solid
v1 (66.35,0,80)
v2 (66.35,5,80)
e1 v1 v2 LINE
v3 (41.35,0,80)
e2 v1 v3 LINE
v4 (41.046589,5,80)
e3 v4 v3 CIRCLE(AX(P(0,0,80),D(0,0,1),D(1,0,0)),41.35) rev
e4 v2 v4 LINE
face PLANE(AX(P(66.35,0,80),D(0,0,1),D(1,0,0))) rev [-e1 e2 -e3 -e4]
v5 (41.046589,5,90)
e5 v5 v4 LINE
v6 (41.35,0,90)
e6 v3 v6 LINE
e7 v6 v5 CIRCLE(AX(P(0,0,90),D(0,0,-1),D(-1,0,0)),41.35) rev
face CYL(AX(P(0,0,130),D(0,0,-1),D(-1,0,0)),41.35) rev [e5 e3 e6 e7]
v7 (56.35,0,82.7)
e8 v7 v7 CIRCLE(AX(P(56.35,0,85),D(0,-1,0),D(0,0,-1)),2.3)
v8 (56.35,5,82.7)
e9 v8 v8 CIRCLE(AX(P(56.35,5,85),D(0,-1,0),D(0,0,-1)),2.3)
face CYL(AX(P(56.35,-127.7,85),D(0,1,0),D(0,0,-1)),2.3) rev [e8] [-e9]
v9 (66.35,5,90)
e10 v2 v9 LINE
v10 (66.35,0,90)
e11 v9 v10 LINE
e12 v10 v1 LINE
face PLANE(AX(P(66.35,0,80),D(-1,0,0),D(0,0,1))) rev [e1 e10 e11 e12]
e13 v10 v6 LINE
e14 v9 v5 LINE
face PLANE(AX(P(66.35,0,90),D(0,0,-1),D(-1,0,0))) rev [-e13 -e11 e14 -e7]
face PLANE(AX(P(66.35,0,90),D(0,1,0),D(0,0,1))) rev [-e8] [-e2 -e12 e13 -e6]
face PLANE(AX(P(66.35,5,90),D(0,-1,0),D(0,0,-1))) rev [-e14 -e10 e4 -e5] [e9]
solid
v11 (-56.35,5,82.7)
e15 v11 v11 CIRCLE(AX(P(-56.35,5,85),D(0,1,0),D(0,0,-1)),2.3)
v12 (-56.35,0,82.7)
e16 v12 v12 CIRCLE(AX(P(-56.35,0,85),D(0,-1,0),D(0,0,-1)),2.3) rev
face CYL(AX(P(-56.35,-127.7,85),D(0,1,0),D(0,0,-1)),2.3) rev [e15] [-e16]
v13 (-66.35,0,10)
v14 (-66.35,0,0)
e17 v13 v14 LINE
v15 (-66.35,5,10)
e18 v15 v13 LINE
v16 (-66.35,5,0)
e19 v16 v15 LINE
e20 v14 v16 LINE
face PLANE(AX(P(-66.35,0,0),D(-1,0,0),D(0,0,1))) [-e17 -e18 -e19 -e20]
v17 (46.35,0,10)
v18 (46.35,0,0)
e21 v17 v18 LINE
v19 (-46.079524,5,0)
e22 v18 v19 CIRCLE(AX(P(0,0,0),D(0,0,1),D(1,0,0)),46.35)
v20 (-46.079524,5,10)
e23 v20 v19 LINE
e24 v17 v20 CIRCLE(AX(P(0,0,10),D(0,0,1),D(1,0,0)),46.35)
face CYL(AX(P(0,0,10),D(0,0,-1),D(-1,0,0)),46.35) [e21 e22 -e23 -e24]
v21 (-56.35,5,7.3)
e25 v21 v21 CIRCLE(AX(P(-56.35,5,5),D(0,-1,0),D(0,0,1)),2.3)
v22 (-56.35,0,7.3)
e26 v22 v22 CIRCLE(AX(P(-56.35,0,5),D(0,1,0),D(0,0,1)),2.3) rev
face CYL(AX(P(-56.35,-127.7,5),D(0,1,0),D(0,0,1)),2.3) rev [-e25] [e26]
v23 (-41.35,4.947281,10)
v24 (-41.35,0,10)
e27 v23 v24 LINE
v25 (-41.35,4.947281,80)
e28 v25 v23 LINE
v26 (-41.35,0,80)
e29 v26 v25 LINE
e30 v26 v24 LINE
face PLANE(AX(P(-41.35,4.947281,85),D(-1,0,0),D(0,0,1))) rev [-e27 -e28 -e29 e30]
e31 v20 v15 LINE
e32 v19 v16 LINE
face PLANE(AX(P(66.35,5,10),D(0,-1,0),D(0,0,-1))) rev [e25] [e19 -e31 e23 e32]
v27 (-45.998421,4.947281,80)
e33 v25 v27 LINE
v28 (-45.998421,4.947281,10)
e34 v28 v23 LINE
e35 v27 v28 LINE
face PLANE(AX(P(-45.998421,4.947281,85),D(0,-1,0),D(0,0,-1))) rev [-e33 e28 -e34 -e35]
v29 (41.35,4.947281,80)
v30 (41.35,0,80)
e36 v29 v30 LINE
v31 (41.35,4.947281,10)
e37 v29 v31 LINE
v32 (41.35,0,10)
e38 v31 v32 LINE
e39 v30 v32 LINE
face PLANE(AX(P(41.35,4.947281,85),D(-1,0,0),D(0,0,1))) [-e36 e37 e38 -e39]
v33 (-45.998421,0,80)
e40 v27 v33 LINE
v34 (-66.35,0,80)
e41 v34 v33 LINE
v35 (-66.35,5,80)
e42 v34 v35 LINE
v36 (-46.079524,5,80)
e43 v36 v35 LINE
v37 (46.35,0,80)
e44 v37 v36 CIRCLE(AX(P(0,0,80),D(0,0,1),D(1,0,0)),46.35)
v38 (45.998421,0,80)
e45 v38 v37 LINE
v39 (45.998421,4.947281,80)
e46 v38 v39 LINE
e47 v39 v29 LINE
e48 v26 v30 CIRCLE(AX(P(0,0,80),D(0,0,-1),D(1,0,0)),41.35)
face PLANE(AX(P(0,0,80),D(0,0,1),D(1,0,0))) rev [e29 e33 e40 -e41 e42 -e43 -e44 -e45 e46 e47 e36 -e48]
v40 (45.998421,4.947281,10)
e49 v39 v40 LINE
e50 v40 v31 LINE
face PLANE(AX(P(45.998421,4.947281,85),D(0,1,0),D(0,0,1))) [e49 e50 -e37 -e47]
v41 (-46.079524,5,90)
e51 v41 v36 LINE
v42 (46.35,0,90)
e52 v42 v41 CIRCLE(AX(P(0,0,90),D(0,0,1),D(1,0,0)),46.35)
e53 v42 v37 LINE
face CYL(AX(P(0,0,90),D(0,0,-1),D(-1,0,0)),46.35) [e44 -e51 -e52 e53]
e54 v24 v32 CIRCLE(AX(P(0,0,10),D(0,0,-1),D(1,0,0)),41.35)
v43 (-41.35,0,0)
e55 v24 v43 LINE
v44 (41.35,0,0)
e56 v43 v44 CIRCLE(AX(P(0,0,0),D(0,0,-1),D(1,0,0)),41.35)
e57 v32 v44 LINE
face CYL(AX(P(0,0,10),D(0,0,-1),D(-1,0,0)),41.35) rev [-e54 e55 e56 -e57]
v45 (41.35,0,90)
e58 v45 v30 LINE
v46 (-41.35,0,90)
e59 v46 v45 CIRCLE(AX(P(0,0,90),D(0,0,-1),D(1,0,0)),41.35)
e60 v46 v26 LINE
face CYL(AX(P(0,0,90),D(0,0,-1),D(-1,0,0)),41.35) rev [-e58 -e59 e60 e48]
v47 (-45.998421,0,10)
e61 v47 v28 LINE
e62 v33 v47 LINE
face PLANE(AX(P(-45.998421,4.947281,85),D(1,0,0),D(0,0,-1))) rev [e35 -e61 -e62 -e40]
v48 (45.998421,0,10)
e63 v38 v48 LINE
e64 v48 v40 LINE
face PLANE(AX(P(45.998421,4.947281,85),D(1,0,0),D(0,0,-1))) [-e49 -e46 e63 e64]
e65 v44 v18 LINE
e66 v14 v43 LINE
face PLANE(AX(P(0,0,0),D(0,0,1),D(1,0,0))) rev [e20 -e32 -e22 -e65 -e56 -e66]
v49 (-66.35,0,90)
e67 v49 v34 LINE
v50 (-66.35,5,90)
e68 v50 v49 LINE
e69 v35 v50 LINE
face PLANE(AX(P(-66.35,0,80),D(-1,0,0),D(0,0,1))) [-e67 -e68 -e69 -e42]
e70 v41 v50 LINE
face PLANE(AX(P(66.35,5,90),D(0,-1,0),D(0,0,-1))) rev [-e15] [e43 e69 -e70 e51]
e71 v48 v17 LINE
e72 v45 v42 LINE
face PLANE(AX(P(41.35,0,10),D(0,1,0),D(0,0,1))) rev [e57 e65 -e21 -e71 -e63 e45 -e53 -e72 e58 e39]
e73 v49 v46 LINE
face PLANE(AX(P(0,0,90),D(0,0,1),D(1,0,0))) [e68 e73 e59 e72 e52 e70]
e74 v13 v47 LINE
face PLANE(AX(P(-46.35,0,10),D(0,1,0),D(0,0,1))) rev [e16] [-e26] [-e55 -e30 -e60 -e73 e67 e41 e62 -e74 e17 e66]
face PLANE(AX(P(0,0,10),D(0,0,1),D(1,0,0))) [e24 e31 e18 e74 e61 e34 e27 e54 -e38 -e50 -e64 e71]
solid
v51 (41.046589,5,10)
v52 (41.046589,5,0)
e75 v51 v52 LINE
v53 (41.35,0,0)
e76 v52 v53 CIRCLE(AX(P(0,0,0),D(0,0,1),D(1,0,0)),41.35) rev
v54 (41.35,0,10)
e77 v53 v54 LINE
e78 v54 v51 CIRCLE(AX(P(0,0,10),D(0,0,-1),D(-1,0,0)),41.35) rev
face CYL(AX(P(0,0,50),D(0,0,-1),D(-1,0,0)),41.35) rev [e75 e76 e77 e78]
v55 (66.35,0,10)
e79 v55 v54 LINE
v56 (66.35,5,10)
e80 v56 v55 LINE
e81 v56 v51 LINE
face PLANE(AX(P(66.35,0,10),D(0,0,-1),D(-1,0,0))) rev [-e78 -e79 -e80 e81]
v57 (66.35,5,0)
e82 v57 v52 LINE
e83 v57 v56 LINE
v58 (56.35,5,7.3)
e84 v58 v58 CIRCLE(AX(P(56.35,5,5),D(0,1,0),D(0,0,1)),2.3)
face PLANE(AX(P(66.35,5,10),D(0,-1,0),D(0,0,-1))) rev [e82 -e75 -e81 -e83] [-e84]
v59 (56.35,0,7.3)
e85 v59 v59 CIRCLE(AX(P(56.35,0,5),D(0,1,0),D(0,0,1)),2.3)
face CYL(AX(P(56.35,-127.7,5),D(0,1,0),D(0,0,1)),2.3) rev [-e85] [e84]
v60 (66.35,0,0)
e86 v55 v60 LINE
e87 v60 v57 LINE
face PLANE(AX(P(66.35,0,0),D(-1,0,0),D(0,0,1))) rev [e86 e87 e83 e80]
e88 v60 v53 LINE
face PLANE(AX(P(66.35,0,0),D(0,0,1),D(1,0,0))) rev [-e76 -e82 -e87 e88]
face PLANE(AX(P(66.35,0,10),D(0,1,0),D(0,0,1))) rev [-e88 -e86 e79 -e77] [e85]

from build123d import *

# Parameters (mm, degrees)
BOSS_EXTRUDE1_DEPTH     = 10
SKETCH2_W               = 10
SKETCH2_H               = 5
BOSS_EXTRUDE2_DEPTH     = 66.35
SKETCH3_R               = 2.3
CUT_EXTRUDE1_DEPTH      = 132.7
SKETCH4_R               = 41.35
CUT_EXTRUDE3_DEPTH      = 50
LPATTERN4_START         = 80
LPATTERN4_DEPTH         = 10
LPATTERN4_2_DEPTH       = 10
LPATTERN4_3_DEPTH       = 10
MIRROR5_COPY_1_SKETCH_R = 2.3
MIRROR5_COPY_1_DEPTH    = 132.7
SKETCH8_W               = 4.648420871
SKETCH8_H               = 4.94728133
BOSS_EXTRUDE3_DEPTH     = 40


# Read off the part's stored shape, not the designer's step: LPattern4
with BuildPart() as part:
    # Sketch1 → Boss-Extrude1 (new body)
    with BuildSketch(Plane.XY):
        with BuildLine():
            Line((-46.35, 0), (-41.35, 0))
            ThreePointArc((-41.35, 0), (0, 41.35), (41.35, 0))
            Line((41.35, 0), (46.35, 0))
            ThreePointArc((46.35, 0), (0, 46.35), (-46.35, 0))
        make_face()
    extrude(amount=BOSS_EXTRUDE1_DEPTH)



with BuildPart() as body_2:
    # Sketch2 → Boss-Extrude2 (new, symmetric)
    with BuildSketch(Plane(origin=(0, 0, 0), x_dir=(0, 0, -1), z_dir=(1, 0, 0))):
        with Locations((-5, 2.5)):
            Rectangle(SKETCH2_W, SKETCH2_H)
    extrude(amount=BOSS_EXTRUDE2_DEPTH, both=True)

    # Sketch3 → Cut-Extrude1 (cut)
    with BuildSketch(Plane(origin=(0, 5, 0), x_dir=(1, 0, 0), z_dir=(0, 1, 0))):
        with Locations(Location((56.35, -5, 0), (0, 0, 270))):
            Circle(SKETCH3_R)
    cut_extrude1 = extrude(amount=-CUT_EXTRUDE1_DEPTH, mode=Mode.SUBTRACT)

    # Mirror1: Cut-Extrude1 across plane
    add(cut_extrude1.mirror(Plane(origin=(0, 0, 0), x_dir=(0, 0, 1), z_dir=(1, 0, 0))), mode=Mode.SUBTRACT)

    # Sketch4 → Cut-Extrude3 (cut, symmetric)
    with BuildSketch(Plane.XY):
        Circle(SKETCH4_R)
    extrude(amount=CUT_EXTRUDE3_DEPTH, both=True, mode=Mode.SUBTRACT)


with BuildPart() as cut_extrude3_piece_1:
    # of the separate pieces the step leaves, piece 1, a body of its own (cut_extrude3_pieces)
    add(body_2.part.solids().sort_by_distance((-41.35, 0, 10))[0])


with BuildPart() as cut_extrude3_piece_2:
    # of the separate pieces the step leaves, piece 2, a body of its own (cut_extrude3_pieces)
    add(body_2.part.solids().sort_by_distance((66.35, 0, 10))[0])


with BuildPart() as body_4:
    # LPattern4 outline → LPattern4 (new body)
    with BuildSketch(Plane.XY.offset(LPATTERN4_START)):
        with BuildLine():
            Line((66.35, 0), (66.35, 5))
            Line((66.35, 5), (41.046589383, 5))
            ThreePointArc((41.046589383, 5), (41.274077646, 2.504598671), (41.35, 0))
            Line((41.35, 0), (66.35, 0))
        make_face()
    extrude(amount=LPATTERN4_DEPTH)

    # Mirror5: Cut-Extrude1 across plane
    add(cut_extrude1.mirror(Plane.XY.offset(45)), mode=Mode.SUBTRACT)


with BuildPart() as body_5:
    # LPattern4 2 outline → LPattern4 2 (new body)
    with BuildSketch(Plane.XY.offset(LPATTERN4_START)):
        with BuildLine():
            Line((-46.35, 0), (-41.35, 0))
            ThreePointArc((-41.35, 0), (0, 41.35), (41.35, 0))
            Line((41.35, 0), (46.35, 0))
            ThreePointArc((46.35, 0), (0, 46.35), (-46.35, 0))
        make_face()
    extrude(amount=LPATTERN4_2_DEPTH)


with BuildPart() as body_6:
    # LPattern4 3 outline → LPattern4 3 (new body)
    with BuildSketch(Plane.XY.offset(LPATTERN4_START)):
        with BuildLine():
            Line((-66.35, 0), (-41.35, 0))
            ThreePointArc((-41.35, 0), (-41.274077646, 2.504598671), (-41.046589383, 5))
            Line((-41.046589383, 5), (-66.35, 5))
            Line((-66.35, 5), (-66.35, 0))
        make_face()
    extrude(amount=LPATTERN4_3_DEPTH)

    # Mirror5 copy 1 sketch → Mirror5 copy 1 (cut)
    with BuildSketch(Plane(origin=(0, 5, 90), x_dir=(-1, 0, 0), z_dir=(0, 1, 0))):
        with Locations(Location((56.35, -5, 0), (0, 0, 270))):
            Circle(MIRROR5_COPY_1_SKETCH_R)
    extrude(amount=-MIRROR5_COPY_1_DEPTH, mode=Mode.SUBTRACT)


with BuildPart() as part_1:
    add(part.part)

    add(cut_extrude3_piece_1.part)  # Boss-Extrude3 merges Cut-Extrude3 piece 1

    add(body_5.part)  # Boss-Extrude3 merges body 5

    add(body_6.part)  # Boss-Extrude3 merges body 6
    # Sketch8 → Boss-Extrude3 (add, symmetric)
    with BuildSketch(Plane.XY.offset(45)):
        with Locations((-43.674210436, 2.473640665)):
            Rectangle(SKETCH8_W, SKETCH8_H)
    boss_extrude3 = extrude(amount=BOSS_EXTRUDE3_DEPTH, both=True)

    # Mirror6: Boss-Extrude3 across plane
    add(boss_extrude3.mirror(Plane(origin=(0, 0, 0), x_dir=(0, 0, 1), z_dir=(1, 0, 0))))


solid = Compound([cut_extrude3_piece_2.part, body_4.part, part_1.part])
